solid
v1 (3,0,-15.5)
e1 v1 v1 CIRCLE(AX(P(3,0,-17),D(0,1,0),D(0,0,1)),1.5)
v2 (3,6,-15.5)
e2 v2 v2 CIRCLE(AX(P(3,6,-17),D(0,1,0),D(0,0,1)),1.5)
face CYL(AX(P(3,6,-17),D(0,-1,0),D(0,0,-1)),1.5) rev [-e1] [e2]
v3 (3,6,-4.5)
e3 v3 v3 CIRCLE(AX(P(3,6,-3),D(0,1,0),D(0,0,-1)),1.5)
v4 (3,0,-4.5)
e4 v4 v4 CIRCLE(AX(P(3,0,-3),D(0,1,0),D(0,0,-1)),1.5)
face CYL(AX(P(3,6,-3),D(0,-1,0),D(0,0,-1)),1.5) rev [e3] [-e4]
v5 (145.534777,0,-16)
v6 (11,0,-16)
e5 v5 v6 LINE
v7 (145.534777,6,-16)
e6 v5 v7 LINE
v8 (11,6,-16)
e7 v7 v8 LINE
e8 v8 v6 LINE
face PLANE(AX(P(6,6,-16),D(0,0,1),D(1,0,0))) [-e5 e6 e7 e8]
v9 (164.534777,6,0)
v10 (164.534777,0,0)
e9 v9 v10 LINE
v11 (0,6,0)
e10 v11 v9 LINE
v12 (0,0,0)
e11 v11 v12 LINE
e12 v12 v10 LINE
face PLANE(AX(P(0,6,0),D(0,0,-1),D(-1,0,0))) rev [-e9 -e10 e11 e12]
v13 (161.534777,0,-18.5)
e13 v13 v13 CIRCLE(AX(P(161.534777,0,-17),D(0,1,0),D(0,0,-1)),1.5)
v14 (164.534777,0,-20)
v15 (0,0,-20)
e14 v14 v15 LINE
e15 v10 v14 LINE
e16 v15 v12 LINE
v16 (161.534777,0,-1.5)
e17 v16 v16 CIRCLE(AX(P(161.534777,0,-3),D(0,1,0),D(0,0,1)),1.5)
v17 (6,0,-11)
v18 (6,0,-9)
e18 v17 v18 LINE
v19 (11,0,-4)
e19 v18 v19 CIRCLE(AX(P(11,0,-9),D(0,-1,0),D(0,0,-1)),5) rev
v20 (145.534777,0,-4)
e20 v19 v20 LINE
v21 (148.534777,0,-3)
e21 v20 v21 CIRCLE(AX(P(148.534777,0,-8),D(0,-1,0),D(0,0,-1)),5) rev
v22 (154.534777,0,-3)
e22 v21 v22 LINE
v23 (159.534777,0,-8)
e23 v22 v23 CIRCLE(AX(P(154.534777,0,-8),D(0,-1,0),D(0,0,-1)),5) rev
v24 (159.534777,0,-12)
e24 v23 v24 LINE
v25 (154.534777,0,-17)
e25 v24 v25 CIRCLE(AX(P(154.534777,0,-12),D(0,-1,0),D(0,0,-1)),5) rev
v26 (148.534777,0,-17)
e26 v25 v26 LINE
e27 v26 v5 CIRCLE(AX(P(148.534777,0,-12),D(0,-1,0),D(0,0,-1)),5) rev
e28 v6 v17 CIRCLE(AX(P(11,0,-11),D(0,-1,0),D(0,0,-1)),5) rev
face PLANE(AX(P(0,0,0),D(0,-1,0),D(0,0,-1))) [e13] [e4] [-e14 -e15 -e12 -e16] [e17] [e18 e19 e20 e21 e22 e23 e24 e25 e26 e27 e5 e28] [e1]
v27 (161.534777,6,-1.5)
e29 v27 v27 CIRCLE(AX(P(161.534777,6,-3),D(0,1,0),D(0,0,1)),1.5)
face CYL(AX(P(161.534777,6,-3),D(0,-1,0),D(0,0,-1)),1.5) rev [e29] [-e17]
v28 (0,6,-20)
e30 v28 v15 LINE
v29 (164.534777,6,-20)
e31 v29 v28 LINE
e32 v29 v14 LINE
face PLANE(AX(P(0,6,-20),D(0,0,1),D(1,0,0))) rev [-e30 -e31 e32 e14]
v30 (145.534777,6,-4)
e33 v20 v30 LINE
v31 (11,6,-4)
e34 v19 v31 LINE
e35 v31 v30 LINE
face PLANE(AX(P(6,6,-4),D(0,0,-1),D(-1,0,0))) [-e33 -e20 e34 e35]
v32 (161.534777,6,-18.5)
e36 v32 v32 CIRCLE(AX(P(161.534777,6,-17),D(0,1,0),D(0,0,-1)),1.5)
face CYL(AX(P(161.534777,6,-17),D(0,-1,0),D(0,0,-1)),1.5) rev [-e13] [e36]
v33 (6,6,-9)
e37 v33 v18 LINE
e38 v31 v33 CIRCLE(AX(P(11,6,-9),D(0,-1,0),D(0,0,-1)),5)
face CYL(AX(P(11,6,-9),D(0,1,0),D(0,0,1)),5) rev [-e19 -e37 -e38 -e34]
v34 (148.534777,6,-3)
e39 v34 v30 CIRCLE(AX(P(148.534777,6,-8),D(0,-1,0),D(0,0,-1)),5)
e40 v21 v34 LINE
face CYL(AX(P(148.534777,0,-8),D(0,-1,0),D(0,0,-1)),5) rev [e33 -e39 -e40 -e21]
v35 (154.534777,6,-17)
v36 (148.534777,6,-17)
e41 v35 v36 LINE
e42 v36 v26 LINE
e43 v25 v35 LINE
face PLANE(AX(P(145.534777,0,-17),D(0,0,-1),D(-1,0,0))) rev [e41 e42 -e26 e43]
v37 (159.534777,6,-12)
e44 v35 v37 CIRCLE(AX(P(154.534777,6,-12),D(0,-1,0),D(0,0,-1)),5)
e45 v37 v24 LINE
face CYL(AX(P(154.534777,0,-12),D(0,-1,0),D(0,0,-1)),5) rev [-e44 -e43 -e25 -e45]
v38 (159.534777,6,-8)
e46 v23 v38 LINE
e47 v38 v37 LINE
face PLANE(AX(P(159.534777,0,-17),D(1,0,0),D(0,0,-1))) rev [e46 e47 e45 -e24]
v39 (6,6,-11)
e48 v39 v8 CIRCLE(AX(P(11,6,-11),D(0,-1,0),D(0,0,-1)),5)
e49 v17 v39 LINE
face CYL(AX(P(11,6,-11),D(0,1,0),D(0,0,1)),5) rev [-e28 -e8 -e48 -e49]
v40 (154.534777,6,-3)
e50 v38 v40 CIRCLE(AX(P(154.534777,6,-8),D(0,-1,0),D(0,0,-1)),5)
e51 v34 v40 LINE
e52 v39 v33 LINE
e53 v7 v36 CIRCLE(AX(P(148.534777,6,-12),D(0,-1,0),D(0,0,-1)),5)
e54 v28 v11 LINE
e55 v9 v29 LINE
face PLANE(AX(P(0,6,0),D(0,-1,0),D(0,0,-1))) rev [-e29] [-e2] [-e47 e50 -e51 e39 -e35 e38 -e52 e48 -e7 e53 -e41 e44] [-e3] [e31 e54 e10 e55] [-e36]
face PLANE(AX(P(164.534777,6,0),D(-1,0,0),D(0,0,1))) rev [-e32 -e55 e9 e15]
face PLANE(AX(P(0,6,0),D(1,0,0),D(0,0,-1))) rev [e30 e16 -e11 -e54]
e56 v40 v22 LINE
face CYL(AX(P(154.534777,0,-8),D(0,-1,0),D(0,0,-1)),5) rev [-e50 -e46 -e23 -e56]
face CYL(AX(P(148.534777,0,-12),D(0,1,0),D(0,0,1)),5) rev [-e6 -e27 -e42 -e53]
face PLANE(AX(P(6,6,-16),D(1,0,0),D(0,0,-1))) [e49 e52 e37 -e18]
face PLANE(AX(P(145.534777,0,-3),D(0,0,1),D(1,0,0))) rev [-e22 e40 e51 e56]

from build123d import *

# Parameters (mm, degrees)
SKETCH1_W           = 164.534777256
SKETCH1_H           = 20
SKETCH1_R           = 1.5
SKETCH1_W_2         = 152.534777256
SKETCH1_H_2         = 12
BOSS_EXTRUDE1_DEPTH = 6
CUT_EXTRUDE1_DEPTH  = 166.854432943
FILLET1_R           = 5


with BuildPart() as part:
    # Sketch1 → Boss-Extrude1 (new body)
    with BuildSketch(Plane(origin=(0, 0, 0), x_dir=(1, 0, 0), z_dir=(0, 1, 0))):
        with Locations((82.267388628, 10)):
            Rectangle(SKETCH1_W, SKETCH1_H)
        with Locations(Location((3, 17, 0), (0, 0, 270))):
            Circle(SKETCH1_R, mode=Mode.SUBTRACT)
        with Locations(Location((3, 3, 0), (0, 0, 90))):
            Circle(SKETCH1_R, mode=Mode.SUBTRACT)
        with Locations(Location((161.534777256, 3, 0), (0, 0, 270))):
            Circle(SKETCH1_R, mode=Mode.SUBTRACT)
        with Locations(Location((161.534777256, 17, 0), (0, 0, 90))):
            Circle(SKETCH1_R, mode=Mode.SUBTRACT)
        with Locations((82.267388628, 10)):
            Rectangle(SKETCH1_W_2, SKETCH1_H_2, mode=Mode.SUBTRACT)
    extrude(amount=BOSS_EXTRUDE1_DEPTH)

    # Sketch2 → Cut-Extrude1 (cut, through all)
    with BuildSketch(Plane(origin=(0, 6, 0), x_dir=(1, 0, 0), z_dir=(0, 1, 0))):
        Polygon((145.534777256, 17), (145.534777256, 16), (158.534777256, 16), (158.534777256, 4), (145.534777256, 4), (145.534777256, 3), (159.534777256, 3), (159.534777256, 17), align=None)
    extrude(amount=-CUT_EXTRUDE1_DEPTH, mode=Mode.SUBTRACT)

    # Fillet1
    # the kernel refuses this fillet: 5 mm, written as the material it adds along each edge
    with BuildSketch(Plane(origin=(159.534777256, 6, -17), x_dir=(0, 0, 1), z_dir=(0, -1, 0)), Plane(origin=(159.534777256, 6, -3), x_dir=(-1, 0, 0), z_dir=(0, -1, 0)), Plane(origin=(6, 0, -16), x_dir=(0, 0, 1), z_dir=(0, 1, 0))) as fillet1_piece_1:
        with BuildLine():
            CenterArc((FILLET1_R, FILLET1_R), FILLET1_R, 180, 90)
            Line((0, FILLET1_R), (-FILLET1_R * 0.02, FILLET1_R))
            Line((-FILLET1_R * 0.02, FILLET1_R), (-FILLET1_R * 0.02, -FILLET1_R * 0.02))
            Line((-FILLET1_R * 0.02, -FILLET1_R * 0.02), (FILLET1_R, -FILLET1_R * 0.02))
            Line((FILLET1_R, -FILLET1_R * 0.02), (FILLET1_R, 0))
        make_face()
    extrude(amount=6)
    with BuildSketch(Plane(origin=(145.534777256, 6, -17), x_dir=(1, 0, 0), z_dir=(0, -1, 0))) as fillet1_piece_2:
        with BuildLine():
            CenterArc((3, 5), FILLET1_R, 233.130102354, 36.869897646)
            Line((0, 1), (-0.06, 0.92))
            ThreePointArc((-0.06, 0.92), (-0.1, 0.5), (-0.1, 0))
            Line((-0.1, 0), (0, -0.1))
            Line((0, -0.1), (3, -0.1))
            Line((3, -0.1), (3, 0))
        make_face()
    extrude(amount=6)
    with BuildSketch(Plane(origin=(145.534777256, 6, -3), x_dir=(0, 0, -1), z_dir=(0, -1, 0))) as fillet1_piece_3:
        with BuildLine():
            CenterArc((5, 3), FILLET1_R, 180, 36.869897646)
            Line((0, 3), (-0.1, 3))
            Line((-0.1, 3), (-0.1, 0))
            Line((-0.1, 0), (0, -0.1))
            ThreePointArc((0, -0.1), (0.5, -0.1), (0.92, -0.06))
            Line((0.92, -0.06), (1, 0))
        make_face()
    extrude(amount=6)
    with BuildSketch(Plane(origin=(6, 0, -4), x_dir=(0, 0, -1), z_dir=(0, 1, 0))) as fillet1_piece_4:
        with BuildLine():
            CenterArc((FILLET1_R, -FILLET1_R), FILLET1_R, 90, 90)
            Line((0, -FILLET1_R), (-FILLET1_R * 0.02, -FILLET1_R))
            Line((-FILLET1_R * 0.02, -FILLET1_R), (-FILLET1_R * 0.02, FILLET1_R * 0.02))
            Line((-FILLET1_R * 0.02, FILLET1_R * 0.02), (FILLET1_R, FILLET1_R * 0.02))
            Line((FILLET1_R, FILLET1_R * 0.02), (FILLET1_R, 0))
        make_face()
    extrude(amount=6)


solid = part.part
